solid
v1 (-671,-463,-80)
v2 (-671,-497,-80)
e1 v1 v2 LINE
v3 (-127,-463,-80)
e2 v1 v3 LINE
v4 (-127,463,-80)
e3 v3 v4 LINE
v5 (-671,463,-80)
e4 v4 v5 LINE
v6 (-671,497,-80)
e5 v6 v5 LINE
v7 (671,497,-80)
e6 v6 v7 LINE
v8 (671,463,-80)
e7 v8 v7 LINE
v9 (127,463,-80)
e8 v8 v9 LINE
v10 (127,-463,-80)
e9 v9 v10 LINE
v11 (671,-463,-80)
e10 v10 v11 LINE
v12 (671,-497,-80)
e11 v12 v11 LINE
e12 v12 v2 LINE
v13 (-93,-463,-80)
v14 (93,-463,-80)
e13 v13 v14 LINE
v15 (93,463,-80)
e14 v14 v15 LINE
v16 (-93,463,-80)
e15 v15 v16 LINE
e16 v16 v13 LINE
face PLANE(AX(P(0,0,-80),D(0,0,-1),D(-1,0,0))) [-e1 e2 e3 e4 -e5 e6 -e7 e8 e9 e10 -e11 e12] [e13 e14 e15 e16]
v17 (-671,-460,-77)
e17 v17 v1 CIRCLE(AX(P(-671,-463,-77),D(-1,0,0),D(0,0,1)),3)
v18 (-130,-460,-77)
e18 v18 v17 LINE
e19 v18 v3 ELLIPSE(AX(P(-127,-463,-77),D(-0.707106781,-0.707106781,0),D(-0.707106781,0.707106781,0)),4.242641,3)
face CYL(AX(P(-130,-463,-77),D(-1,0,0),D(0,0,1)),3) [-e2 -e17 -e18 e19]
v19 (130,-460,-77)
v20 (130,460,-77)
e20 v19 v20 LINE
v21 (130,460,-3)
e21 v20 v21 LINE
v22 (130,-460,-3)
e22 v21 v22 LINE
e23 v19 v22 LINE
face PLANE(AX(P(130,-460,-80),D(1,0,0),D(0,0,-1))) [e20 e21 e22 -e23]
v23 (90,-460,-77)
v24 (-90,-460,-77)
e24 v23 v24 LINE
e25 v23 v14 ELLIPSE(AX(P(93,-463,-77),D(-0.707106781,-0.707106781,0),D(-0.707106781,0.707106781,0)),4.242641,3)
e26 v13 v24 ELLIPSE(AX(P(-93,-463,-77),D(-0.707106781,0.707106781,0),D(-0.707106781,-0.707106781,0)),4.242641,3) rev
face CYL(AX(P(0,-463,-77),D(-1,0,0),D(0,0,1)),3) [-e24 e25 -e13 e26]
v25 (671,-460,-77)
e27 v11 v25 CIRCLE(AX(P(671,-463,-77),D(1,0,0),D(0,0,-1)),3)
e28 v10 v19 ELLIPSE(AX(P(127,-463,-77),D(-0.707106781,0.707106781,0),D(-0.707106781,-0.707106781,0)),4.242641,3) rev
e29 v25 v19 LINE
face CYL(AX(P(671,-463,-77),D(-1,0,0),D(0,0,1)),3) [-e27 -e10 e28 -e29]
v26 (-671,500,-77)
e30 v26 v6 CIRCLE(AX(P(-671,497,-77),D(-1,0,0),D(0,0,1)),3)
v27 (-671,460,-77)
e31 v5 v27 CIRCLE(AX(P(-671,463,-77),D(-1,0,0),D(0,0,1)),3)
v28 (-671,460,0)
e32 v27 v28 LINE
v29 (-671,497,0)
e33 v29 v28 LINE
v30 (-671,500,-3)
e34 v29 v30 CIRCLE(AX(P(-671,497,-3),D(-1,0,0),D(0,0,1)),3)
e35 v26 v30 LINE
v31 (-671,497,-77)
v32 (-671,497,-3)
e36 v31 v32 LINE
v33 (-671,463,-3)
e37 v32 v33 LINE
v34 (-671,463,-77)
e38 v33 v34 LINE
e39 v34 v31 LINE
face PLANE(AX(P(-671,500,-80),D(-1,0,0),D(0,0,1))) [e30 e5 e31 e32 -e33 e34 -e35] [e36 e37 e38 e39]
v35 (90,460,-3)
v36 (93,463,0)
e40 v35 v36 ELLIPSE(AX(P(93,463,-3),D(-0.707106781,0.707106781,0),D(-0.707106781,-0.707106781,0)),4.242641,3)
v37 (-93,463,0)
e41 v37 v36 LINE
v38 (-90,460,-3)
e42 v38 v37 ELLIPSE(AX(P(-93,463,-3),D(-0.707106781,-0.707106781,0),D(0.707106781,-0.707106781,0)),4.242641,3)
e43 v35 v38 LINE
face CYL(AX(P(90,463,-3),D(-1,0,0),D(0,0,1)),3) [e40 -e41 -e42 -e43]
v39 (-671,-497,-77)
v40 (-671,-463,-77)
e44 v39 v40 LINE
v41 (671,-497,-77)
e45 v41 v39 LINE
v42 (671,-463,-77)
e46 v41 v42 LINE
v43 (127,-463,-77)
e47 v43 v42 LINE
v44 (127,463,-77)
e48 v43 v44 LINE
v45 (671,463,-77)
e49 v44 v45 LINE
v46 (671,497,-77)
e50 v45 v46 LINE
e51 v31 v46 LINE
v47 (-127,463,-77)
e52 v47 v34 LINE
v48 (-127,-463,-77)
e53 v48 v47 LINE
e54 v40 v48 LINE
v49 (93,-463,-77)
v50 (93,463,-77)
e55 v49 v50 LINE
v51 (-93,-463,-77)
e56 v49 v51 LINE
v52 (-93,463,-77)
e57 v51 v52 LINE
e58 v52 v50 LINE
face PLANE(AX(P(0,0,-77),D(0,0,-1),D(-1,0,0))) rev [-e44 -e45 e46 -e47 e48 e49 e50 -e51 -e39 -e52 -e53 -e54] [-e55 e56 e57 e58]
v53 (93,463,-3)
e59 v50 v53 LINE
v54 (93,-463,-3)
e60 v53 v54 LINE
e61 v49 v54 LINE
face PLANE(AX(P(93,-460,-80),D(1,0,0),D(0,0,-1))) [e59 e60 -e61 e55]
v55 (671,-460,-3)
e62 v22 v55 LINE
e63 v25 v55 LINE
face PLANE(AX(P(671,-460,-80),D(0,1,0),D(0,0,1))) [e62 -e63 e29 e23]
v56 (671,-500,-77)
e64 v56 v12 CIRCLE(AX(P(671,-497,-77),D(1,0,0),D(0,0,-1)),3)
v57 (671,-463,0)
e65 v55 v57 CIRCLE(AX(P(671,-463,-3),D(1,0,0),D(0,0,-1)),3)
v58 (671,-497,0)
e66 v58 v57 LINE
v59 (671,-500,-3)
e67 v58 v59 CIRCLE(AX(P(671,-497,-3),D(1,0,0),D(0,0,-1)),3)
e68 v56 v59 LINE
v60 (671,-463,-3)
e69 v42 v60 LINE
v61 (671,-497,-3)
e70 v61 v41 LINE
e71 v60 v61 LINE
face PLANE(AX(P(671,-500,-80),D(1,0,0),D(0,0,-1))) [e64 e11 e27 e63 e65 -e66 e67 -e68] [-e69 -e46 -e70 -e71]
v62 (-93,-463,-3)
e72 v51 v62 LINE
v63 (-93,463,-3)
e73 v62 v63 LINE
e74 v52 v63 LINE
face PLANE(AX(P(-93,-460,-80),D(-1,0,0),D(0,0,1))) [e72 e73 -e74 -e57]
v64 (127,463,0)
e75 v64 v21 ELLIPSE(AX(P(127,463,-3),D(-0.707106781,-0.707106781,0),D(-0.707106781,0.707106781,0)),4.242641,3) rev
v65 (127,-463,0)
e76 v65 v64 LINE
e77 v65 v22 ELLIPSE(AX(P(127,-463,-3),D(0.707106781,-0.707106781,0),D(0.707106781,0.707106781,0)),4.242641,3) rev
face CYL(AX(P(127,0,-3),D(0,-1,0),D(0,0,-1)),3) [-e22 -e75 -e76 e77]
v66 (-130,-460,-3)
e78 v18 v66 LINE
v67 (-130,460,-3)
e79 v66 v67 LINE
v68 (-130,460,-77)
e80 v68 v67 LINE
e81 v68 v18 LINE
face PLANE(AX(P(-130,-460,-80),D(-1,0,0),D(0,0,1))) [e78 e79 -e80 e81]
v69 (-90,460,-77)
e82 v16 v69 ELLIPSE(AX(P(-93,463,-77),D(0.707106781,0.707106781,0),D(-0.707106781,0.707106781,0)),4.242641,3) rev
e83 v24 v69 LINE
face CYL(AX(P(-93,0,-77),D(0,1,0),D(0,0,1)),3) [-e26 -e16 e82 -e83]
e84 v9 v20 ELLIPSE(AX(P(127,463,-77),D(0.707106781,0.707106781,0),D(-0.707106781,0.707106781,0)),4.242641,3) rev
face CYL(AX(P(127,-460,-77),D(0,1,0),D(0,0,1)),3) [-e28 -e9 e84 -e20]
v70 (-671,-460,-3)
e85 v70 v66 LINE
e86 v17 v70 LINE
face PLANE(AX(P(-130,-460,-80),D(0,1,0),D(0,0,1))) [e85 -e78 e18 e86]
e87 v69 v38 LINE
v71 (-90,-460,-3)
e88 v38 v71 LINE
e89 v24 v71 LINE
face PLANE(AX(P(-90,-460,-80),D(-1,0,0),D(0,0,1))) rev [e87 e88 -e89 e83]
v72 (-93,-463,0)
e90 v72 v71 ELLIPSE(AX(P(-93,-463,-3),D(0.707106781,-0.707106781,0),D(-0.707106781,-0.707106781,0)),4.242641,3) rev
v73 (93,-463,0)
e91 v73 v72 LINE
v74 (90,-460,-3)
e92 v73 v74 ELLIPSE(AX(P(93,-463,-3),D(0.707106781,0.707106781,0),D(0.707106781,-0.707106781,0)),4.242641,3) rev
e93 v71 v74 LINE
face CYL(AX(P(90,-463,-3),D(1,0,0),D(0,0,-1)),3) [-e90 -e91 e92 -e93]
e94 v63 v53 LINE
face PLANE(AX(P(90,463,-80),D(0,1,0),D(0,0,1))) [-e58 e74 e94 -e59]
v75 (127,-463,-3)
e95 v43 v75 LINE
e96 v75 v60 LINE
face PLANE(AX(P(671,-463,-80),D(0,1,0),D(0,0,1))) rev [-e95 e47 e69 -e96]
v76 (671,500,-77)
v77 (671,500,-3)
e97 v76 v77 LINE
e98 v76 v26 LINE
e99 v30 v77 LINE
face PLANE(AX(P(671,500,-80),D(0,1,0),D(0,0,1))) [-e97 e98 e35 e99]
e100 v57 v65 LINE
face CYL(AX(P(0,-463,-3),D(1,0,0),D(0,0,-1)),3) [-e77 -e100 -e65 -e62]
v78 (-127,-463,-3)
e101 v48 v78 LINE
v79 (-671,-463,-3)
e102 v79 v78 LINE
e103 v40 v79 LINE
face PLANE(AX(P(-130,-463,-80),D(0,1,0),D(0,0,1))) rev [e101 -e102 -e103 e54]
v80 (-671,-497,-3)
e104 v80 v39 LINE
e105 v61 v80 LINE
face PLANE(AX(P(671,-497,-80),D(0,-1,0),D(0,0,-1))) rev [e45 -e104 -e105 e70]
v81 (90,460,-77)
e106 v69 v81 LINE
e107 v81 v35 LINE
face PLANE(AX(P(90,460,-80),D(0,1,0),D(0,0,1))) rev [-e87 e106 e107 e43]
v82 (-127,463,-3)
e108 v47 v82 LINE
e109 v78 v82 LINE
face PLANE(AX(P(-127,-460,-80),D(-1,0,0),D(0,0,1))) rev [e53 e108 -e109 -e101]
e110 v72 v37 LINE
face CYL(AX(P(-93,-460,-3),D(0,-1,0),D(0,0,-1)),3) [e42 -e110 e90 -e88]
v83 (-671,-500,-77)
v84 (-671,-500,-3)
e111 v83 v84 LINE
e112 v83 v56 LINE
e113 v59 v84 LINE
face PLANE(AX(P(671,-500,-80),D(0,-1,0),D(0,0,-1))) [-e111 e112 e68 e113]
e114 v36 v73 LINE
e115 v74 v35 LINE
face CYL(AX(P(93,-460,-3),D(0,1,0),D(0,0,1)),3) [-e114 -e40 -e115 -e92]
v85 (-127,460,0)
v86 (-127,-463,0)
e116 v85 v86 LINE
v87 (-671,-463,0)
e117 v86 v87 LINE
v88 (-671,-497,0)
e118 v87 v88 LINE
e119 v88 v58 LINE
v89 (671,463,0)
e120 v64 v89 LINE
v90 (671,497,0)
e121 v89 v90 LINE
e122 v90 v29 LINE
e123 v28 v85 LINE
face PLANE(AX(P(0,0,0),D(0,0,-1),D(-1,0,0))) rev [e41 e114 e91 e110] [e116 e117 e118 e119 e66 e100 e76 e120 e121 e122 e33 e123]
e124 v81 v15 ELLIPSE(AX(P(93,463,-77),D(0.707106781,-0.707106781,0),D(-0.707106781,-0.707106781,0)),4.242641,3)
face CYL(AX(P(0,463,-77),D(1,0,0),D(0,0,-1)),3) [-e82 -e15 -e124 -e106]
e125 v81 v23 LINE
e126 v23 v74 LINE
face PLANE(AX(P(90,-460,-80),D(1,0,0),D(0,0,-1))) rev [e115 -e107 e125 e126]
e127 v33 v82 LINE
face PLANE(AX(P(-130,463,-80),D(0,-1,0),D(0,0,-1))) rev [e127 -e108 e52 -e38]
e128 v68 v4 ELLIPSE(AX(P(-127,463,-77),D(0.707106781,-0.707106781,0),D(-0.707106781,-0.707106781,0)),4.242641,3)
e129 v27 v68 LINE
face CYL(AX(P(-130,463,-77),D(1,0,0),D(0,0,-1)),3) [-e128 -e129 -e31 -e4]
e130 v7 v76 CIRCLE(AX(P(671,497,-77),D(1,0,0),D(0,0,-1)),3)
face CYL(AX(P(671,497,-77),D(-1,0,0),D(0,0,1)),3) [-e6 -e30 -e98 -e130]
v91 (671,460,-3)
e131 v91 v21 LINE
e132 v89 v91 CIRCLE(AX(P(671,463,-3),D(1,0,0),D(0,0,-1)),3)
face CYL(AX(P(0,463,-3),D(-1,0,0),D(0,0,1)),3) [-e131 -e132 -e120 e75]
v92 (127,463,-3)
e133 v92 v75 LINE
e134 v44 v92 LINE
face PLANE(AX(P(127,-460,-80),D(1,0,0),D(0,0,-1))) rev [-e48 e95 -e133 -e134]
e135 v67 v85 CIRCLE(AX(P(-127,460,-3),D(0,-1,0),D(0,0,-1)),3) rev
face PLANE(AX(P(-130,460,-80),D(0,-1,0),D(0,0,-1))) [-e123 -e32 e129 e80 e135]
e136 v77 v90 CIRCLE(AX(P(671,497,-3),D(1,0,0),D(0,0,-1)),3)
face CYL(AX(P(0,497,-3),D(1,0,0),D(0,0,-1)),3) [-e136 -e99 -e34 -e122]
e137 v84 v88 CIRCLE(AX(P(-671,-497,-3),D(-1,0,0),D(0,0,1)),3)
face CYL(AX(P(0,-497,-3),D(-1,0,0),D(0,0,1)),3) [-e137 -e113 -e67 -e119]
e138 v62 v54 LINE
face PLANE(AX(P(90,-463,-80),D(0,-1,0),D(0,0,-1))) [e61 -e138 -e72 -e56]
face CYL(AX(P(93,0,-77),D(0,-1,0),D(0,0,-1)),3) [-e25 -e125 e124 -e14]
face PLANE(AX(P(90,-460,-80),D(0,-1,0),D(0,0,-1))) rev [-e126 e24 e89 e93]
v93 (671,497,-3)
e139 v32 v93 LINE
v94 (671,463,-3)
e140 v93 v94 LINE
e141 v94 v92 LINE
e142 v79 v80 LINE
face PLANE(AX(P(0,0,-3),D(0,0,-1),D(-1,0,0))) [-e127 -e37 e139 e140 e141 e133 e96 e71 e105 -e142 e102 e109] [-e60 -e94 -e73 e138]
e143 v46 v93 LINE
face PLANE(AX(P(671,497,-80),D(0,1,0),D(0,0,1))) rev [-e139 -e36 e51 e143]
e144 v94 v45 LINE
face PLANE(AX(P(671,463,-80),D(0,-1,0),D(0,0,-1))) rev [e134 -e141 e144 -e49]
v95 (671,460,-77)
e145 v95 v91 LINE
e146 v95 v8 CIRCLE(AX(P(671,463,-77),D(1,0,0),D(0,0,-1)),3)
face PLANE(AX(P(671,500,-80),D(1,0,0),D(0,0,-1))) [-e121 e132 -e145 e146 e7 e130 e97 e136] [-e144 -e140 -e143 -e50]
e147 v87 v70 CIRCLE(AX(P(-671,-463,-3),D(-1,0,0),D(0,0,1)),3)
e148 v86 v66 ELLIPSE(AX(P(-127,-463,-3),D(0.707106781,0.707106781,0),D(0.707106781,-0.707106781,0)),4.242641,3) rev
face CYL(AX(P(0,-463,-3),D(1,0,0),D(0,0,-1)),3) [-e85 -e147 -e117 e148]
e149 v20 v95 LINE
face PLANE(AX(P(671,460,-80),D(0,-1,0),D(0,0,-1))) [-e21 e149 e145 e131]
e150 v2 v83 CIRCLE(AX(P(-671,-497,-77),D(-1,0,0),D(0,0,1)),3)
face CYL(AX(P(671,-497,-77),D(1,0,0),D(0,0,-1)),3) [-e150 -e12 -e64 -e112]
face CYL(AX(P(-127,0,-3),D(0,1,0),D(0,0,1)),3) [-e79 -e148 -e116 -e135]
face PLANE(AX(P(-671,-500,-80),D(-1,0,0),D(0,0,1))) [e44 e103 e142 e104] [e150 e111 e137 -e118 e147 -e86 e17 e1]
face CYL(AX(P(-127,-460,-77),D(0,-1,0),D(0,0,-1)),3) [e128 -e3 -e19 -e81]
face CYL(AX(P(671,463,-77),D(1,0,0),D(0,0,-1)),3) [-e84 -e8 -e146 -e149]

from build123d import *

# Parameters (mm, degrees)
SKETCH1_W               = 180
SKETCH1_H               = 920
BOSS_EXTRUDE1_DEPTH     = 80
FILLET2_R               = 3
SHELL1_START            = -497
SHELL1_OUTLINE_W        = 34
SHELL1_OUTLINE_H        = 74
SHELL1_DEPTH            = 994
SHELL1_2_OUTLINE_W      = 541
SHELL1_2_OUTLINE_H      = 74
SHELL1_2_OUTLINE_W_2    = 186
SHELL1_2_DEPTH          = 34
SHELL1_START_2          = 463
SHELL1_3_OUTLINE_W      = 541
SHELL1_3_OUTLINE_H      = 74
SHELL1_3_OUTLINE_W_2    = 186
SHELL1_3_DEPTH          = 34
CUT_EXTRUDE1_DEPTH      = 1435.351421375
CUT_EXTRUDE1_DEPTH_BACK = 1435.351421375
SKETCH2_W               = 74
SKETCH2_H               = 34


# Read off the part's stored shape, not the designer's step: Shell1
with BuildPart() as part:
    # Sketch1 → Boss-Extrude1 (new body)
    with BuildSketch(Plane.XY):
        Polygon((671, -500), (-671, -500), (-671, -460), (-130, -460), (-130, 460), (-671, 460), (-671, 500), (671, 500), (671, 460), (130, 460), (130, -460), (671, -460), align=None)
        Rectangle(SKETCH1_W, SKETCH1_H, mode=Mode.SUBTRACT)
    extrude(amount=-BOSS_EXTRUDE1_DEPTH)

    # Fillet2
    fillet2_edges = [part.edges().sort_by_distance(p)[0] for p in [
        (-90, 0, 0),
        (0, 460, 0),
        (400.5, 460, 0),
        (0, 500, 0),
        (0, -500, 0),
        (-400.5, -460, 0),
        (-130, 0, 0),
        (400.5, -460, 0),
        (0, -460, 0),
        (90, 0, 0),
        (130, 0, 0),
        (400.5, -460, -80),
        (0, -500, -80),
        (-400.5, -460, -80),
        (0, -460, -80),
        (130, 0, -80),
        (90, 0, -80),
        (-90, 0, -80),
        (-130, 0, -80),
        (-400.5, 460, -80),
        (0, 460, -80),
        (400.5, 460, -80),
        (0, 500, -80),
    ]]
    fillet(fillet2_edges, radius=FILLET2_R)

    # Shell1 outline → Shell1 (cut)
    with BuildSketch(Plane(origin=(0, 0, 0), x_dir=(1, 0, 0), z_dir=(0, 1, 0)).offset(SHELL1_START)):
        with Locations((-110, 40)):
            Rectangle(SHELL1_OUTLINE_W, SHELL1_OUTLINE_H)
        with Locations((110, 40)):
            Rectangle(SHELL1_OUTLINE_W, SHELL1_OUTLINE_H)
    extrude(amount=SHELL1_DEPTH, mode=Mode.SUBTRACT)

    # Shell1 2 outline → Shell1 2 (cut)
    with BuildSketch(Plane(origin=(0, 0, 0), x_dir=(1, 0, 0), z_dir=(0, 1, 0)).offset(SHELL1_START)):
        with Locations((-397.5, 40)):
            Rectangle(SHELL1_2_OUTLINE_W, SHELL1_2_OUTLINE_H)
        with Locations((0, 40)):
            Rectangle(SHELL1_2_OUTLINE_W_2, SHELL1_2_OUTLINE_H)
        with Locations((397.5, 40)):
            Rectangle(SHELL1_2_OUTLINE_W, SHELL1_2_OUTLINE_H)
    extrude(amount=SHELL1_2_DEPTH, mode=Mode.SUBTRACT)

    # Shell1 3 outline → Shell1 3 (cut)
    with BuildSketch(Plane(origin=(0, 0, 0), x_dir=(1, 0, 0), z_dir=(0, 1, 0)).offset(SHELL1_START_2)):
        with Locations((-397.5, 40)):
            Rectangle(SHELL1_3_OUTLINE_W, SHELL1_3_OUTLINE_H)
        with Locations((0, 40)):
            Rectangle(SHELL1_3_OUTLINE_W_2, SHELL1_3_OUTLINE_H)
        with Locations((397.5, 40)):
            Rectangle(SHELL1_3_OUTLINE_W, SHELL1_3_OUTLINE_H)
    extrude(amount=SHELL1_3_DEPTH, mode=Mode.SUBTRACT)

    # Sketch2 → Cut-Extrude1 (cut, two sides: drawn at the far end of the back side and taken through both)
    with BuildSketch(Plane(origin=(671, 0, 0), x_dir=(0, 0, -1), z_dir=(1, 0, 0)).offset(-CUT_EXTRUDE1_DEPTH_BACK)):
        with Locations((40, 480)):
            Rectangle(SKETCH2_W, SKETCH2_H)
        with Locations((40, -480)):
            Rectangle(SKETCH2_W, SKETCH2_H)
    extrude(amount=CUT_EXTRUDE1_DEPTH + CUT_EXTRUDE1_DEPTH_BACK, mode=Mode.SUBTRACT)


solid = part.part
